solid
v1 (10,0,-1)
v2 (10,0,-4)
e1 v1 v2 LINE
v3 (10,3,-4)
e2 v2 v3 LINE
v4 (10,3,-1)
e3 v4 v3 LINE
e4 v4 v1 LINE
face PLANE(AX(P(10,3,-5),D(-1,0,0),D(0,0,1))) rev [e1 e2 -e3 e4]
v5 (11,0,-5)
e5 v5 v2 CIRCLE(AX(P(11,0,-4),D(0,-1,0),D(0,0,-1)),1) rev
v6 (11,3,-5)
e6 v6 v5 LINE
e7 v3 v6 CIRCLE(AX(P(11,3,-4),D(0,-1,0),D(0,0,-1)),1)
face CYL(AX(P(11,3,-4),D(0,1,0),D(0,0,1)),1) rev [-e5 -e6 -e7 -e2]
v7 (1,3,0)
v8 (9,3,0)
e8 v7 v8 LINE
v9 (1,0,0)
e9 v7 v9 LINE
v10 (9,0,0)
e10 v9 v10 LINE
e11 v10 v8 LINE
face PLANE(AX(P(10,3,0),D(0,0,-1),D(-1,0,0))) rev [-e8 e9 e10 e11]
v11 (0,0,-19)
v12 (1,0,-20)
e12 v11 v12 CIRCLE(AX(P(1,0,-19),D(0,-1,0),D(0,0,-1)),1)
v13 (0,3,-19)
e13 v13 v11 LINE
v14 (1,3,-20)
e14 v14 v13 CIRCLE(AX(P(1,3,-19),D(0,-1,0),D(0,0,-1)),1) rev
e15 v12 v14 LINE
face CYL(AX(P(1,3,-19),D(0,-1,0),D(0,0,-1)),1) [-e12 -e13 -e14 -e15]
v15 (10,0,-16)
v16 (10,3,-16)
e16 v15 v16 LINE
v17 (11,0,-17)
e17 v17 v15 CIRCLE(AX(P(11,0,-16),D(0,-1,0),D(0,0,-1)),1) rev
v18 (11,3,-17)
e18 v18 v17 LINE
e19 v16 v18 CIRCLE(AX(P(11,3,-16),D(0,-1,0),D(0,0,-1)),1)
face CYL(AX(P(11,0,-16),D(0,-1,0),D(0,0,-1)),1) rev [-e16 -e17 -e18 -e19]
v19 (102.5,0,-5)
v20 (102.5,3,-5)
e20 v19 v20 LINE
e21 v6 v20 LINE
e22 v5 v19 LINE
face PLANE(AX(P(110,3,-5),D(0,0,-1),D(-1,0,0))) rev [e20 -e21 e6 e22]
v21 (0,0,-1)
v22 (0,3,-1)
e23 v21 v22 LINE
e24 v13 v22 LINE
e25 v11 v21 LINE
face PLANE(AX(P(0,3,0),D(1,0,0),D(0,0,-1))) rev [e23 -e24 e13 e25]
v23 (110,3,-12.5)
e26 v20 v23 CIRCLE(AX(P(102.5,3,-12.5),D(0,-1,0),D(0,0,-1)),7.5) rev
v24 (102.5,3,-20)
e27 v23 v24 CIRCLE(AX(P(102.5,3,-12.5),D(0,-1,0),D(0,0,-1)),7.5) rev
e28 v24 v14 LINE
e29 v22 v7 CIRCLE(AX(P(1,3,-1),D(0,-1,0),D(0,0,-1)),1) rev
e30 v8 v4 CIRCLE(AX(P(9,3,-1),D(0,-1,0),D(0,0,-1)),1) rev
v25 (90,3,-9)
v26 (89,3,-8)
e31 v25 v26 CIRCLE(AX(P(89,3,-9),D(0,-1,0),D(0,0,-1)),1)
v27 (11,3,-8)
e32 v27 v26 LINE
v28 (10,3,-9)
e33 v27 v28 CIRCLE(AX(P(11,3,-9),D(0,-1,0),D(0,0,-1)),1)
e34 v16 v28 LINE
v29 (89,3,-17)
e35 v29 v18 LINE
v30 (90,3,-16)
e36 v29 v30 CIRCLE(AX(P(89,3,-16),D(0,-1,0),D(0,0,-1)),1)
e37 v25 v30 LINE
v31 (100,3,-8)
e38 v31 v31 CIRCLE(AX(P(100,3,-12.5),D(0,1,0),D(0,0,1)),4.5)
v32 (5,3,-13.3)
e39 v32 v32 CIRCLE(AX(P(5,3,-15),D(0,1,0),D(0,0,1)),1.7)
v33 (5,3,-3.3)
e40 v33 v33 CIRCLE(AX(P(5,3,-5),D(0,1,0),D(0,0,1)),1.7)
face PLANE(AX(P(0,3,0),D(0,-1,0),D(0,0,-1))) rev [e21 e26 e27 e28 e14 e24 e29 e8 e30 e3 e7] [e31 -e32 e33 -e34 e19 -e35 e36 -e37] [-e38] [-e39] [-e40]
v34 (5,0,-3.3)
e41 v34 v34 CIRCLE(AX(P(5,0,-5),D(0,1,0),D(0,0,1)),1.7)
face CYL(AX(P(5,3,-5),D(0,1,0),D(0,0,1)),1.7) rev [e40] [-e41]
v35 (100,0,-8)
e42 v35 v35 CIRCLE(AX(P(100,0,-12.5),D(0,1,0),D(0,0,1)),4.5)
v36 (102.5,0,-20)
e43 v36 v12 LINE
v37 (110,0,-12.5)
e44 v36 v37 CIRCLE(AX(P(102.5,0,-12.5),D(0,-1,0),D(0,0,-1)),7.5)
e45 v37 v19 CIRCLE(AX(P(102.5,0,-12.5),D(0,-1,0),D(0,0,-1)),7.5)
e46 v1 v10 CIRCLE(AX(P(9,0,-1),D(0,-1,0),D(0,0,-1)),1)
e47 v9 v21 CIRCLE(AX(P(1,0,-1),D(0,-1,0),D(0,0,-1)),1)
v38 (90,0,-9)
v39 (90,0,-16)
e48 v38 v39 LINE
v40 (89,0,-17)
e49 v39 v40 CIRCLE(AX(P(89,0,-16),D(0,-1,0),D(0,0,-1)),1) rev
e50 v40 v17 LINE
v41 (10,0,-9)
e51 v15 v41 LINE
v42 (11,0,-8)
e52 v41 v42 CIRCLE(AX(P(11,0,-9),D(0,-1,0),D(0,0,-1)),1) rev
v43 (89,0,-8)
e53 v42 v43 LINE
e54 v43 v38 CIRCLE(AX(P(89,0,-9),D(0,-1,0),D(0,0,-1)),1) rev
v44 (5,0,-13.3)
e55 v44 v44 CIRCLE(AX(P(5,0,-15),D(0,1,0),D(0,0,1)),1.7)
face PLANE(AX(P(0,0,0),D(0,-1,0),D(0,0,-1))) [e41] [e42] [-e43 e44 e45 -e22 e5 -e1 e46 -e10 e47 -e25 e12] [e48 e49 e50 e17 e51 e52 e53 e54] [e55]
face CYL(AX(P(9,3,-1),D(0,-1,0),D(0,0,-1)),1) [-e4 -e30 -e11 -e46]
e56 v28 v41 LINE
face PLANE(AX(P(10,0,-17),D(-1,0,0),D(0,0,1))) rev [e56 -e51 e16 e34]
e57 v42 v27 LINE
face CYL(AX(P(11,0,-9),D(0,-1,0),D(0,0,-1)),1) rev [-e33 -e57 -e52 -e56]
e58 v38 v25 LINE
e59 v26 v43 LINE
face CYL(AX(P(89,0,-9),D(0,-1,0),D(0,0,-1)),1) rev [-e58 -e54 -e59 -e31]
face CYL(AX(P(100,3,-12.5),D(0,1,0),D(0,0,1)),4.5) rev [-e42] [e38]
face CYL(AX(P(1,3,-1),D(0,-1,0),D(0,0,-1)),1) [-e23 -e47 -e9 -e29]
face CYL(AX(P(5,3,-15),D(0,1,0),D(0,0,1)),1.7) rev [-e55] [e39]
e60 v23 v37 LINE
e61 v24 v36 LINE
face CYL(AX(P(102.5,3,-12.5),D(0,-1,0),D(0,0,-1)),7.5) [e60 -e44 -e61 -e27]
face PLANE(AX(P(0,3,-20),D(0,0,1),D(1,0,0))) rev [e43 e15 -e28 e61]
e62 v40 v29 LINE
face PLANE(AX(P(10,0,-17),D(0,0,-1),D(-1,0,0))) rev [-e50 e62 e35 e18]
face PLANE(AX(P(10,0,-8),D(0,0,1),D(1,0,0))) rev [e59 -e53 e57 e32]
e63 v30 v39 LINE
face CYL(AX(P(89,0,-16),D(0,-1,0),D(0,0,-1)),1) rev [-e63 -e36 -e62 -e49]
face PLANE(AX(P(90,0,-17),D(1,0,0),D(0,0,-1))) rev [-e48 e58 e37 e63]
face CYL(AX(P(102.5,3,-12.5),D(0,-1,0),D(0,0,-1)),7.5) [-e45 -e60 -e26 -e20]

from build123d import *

# Parameters (mm, degrees)
BOSS_EXTRUDE1_DEPTH  = 3
M8_CLEARANCE_HOLE1_D = 9
M3_CLEARANCE_HOLE1_D = 3.4
FILLET1_R            = 1
FILLET2_R            = 7.5
SKETCH6_W            = 80
SKETCH6_H            = 9
CUT_EXTRUDE1_DEPTH   = 112.843640856
FILLET3_R            = 1


with BuildPart() as part:
    # Sketch1 → Boss-Extrude1 (new body)
    with BuildSketch(Plane(origin=(0, 0, 0), x_dir=(1, 0, 0), z_dir=(0, 1, 0))):
        Polygon((0, 0), (0, 20), (110, 20), (110, 5), (10, 5), (10, 0), align=None)
    extrude(amount=BOSS_EXTRUDE1_DEPTH)

    # M8 Clearance Hole1 (through all)
    with Locations(Plane(origin=(100, 3, -12.5), x_dir=(0, 0, 1), z_dir=(0, 1, 0))):
        with Locations((0, 0)):
            Hole(M8_CLEARANCE_HOLE1_D / 2)

    # M3 Clearance Hole1 (through all)
    with Locations(Plane(origin=(5, 3, -15), x_dir=(0, 0, 1), z_dir=(0, 1, 0))):
        with Locations((0, 0), (10, 0)):
            Hole(M3_CLEARANCE_HOLE1_D / 2)

    # Fillet1
    fillet1_edges = [part.edges().sort_by_distance(p)[0] for p in [
        (0, 1.5, 0),
        (0, 1.5, -20),
        (10, 1.5, -5),
        (10, 1.5, 0),
    ]]
    fillet(fillet1_edges, radius=FILLET1_R)

    # Fillet2
    fillet2_edges = [part.edges().sort_by_distance(p)[0] for p in [
        (110, 1.5, -20),
        (110, 1.5, -5),
    ]]
    fillet(fillet2_edges, radius=FILLET2_R - 0.0001)  # a hair under: the kernel refuses the full size

    # Sketch6 → Cut-Extrude1 (cut, through all)
    with BuildSketch(Plane(origin=(0, 3, 0), x_dir=(1, 0, 0), z_dir=(0, 1, 0))):
        with Locations((50, 12.5)):
            Rectangle(SKETCH6_W, SKETCH6_H)
    extrude(amount=-CUT_EXTRUDE1_DEPTH, mode=Mode.SUBTRACT)

    # Fillet3
    fillet3_edges = [part.edges().sort_by_distance(p)[0] for p in [
        (10, 1.5, -8),
        (10, 1.5, -17),
        (90, 1.5, -17),
        (90, 1.5, -8),
    ]]
    fillet(fillet3_edges, radius=FILLET3_R)


solid = part.part
